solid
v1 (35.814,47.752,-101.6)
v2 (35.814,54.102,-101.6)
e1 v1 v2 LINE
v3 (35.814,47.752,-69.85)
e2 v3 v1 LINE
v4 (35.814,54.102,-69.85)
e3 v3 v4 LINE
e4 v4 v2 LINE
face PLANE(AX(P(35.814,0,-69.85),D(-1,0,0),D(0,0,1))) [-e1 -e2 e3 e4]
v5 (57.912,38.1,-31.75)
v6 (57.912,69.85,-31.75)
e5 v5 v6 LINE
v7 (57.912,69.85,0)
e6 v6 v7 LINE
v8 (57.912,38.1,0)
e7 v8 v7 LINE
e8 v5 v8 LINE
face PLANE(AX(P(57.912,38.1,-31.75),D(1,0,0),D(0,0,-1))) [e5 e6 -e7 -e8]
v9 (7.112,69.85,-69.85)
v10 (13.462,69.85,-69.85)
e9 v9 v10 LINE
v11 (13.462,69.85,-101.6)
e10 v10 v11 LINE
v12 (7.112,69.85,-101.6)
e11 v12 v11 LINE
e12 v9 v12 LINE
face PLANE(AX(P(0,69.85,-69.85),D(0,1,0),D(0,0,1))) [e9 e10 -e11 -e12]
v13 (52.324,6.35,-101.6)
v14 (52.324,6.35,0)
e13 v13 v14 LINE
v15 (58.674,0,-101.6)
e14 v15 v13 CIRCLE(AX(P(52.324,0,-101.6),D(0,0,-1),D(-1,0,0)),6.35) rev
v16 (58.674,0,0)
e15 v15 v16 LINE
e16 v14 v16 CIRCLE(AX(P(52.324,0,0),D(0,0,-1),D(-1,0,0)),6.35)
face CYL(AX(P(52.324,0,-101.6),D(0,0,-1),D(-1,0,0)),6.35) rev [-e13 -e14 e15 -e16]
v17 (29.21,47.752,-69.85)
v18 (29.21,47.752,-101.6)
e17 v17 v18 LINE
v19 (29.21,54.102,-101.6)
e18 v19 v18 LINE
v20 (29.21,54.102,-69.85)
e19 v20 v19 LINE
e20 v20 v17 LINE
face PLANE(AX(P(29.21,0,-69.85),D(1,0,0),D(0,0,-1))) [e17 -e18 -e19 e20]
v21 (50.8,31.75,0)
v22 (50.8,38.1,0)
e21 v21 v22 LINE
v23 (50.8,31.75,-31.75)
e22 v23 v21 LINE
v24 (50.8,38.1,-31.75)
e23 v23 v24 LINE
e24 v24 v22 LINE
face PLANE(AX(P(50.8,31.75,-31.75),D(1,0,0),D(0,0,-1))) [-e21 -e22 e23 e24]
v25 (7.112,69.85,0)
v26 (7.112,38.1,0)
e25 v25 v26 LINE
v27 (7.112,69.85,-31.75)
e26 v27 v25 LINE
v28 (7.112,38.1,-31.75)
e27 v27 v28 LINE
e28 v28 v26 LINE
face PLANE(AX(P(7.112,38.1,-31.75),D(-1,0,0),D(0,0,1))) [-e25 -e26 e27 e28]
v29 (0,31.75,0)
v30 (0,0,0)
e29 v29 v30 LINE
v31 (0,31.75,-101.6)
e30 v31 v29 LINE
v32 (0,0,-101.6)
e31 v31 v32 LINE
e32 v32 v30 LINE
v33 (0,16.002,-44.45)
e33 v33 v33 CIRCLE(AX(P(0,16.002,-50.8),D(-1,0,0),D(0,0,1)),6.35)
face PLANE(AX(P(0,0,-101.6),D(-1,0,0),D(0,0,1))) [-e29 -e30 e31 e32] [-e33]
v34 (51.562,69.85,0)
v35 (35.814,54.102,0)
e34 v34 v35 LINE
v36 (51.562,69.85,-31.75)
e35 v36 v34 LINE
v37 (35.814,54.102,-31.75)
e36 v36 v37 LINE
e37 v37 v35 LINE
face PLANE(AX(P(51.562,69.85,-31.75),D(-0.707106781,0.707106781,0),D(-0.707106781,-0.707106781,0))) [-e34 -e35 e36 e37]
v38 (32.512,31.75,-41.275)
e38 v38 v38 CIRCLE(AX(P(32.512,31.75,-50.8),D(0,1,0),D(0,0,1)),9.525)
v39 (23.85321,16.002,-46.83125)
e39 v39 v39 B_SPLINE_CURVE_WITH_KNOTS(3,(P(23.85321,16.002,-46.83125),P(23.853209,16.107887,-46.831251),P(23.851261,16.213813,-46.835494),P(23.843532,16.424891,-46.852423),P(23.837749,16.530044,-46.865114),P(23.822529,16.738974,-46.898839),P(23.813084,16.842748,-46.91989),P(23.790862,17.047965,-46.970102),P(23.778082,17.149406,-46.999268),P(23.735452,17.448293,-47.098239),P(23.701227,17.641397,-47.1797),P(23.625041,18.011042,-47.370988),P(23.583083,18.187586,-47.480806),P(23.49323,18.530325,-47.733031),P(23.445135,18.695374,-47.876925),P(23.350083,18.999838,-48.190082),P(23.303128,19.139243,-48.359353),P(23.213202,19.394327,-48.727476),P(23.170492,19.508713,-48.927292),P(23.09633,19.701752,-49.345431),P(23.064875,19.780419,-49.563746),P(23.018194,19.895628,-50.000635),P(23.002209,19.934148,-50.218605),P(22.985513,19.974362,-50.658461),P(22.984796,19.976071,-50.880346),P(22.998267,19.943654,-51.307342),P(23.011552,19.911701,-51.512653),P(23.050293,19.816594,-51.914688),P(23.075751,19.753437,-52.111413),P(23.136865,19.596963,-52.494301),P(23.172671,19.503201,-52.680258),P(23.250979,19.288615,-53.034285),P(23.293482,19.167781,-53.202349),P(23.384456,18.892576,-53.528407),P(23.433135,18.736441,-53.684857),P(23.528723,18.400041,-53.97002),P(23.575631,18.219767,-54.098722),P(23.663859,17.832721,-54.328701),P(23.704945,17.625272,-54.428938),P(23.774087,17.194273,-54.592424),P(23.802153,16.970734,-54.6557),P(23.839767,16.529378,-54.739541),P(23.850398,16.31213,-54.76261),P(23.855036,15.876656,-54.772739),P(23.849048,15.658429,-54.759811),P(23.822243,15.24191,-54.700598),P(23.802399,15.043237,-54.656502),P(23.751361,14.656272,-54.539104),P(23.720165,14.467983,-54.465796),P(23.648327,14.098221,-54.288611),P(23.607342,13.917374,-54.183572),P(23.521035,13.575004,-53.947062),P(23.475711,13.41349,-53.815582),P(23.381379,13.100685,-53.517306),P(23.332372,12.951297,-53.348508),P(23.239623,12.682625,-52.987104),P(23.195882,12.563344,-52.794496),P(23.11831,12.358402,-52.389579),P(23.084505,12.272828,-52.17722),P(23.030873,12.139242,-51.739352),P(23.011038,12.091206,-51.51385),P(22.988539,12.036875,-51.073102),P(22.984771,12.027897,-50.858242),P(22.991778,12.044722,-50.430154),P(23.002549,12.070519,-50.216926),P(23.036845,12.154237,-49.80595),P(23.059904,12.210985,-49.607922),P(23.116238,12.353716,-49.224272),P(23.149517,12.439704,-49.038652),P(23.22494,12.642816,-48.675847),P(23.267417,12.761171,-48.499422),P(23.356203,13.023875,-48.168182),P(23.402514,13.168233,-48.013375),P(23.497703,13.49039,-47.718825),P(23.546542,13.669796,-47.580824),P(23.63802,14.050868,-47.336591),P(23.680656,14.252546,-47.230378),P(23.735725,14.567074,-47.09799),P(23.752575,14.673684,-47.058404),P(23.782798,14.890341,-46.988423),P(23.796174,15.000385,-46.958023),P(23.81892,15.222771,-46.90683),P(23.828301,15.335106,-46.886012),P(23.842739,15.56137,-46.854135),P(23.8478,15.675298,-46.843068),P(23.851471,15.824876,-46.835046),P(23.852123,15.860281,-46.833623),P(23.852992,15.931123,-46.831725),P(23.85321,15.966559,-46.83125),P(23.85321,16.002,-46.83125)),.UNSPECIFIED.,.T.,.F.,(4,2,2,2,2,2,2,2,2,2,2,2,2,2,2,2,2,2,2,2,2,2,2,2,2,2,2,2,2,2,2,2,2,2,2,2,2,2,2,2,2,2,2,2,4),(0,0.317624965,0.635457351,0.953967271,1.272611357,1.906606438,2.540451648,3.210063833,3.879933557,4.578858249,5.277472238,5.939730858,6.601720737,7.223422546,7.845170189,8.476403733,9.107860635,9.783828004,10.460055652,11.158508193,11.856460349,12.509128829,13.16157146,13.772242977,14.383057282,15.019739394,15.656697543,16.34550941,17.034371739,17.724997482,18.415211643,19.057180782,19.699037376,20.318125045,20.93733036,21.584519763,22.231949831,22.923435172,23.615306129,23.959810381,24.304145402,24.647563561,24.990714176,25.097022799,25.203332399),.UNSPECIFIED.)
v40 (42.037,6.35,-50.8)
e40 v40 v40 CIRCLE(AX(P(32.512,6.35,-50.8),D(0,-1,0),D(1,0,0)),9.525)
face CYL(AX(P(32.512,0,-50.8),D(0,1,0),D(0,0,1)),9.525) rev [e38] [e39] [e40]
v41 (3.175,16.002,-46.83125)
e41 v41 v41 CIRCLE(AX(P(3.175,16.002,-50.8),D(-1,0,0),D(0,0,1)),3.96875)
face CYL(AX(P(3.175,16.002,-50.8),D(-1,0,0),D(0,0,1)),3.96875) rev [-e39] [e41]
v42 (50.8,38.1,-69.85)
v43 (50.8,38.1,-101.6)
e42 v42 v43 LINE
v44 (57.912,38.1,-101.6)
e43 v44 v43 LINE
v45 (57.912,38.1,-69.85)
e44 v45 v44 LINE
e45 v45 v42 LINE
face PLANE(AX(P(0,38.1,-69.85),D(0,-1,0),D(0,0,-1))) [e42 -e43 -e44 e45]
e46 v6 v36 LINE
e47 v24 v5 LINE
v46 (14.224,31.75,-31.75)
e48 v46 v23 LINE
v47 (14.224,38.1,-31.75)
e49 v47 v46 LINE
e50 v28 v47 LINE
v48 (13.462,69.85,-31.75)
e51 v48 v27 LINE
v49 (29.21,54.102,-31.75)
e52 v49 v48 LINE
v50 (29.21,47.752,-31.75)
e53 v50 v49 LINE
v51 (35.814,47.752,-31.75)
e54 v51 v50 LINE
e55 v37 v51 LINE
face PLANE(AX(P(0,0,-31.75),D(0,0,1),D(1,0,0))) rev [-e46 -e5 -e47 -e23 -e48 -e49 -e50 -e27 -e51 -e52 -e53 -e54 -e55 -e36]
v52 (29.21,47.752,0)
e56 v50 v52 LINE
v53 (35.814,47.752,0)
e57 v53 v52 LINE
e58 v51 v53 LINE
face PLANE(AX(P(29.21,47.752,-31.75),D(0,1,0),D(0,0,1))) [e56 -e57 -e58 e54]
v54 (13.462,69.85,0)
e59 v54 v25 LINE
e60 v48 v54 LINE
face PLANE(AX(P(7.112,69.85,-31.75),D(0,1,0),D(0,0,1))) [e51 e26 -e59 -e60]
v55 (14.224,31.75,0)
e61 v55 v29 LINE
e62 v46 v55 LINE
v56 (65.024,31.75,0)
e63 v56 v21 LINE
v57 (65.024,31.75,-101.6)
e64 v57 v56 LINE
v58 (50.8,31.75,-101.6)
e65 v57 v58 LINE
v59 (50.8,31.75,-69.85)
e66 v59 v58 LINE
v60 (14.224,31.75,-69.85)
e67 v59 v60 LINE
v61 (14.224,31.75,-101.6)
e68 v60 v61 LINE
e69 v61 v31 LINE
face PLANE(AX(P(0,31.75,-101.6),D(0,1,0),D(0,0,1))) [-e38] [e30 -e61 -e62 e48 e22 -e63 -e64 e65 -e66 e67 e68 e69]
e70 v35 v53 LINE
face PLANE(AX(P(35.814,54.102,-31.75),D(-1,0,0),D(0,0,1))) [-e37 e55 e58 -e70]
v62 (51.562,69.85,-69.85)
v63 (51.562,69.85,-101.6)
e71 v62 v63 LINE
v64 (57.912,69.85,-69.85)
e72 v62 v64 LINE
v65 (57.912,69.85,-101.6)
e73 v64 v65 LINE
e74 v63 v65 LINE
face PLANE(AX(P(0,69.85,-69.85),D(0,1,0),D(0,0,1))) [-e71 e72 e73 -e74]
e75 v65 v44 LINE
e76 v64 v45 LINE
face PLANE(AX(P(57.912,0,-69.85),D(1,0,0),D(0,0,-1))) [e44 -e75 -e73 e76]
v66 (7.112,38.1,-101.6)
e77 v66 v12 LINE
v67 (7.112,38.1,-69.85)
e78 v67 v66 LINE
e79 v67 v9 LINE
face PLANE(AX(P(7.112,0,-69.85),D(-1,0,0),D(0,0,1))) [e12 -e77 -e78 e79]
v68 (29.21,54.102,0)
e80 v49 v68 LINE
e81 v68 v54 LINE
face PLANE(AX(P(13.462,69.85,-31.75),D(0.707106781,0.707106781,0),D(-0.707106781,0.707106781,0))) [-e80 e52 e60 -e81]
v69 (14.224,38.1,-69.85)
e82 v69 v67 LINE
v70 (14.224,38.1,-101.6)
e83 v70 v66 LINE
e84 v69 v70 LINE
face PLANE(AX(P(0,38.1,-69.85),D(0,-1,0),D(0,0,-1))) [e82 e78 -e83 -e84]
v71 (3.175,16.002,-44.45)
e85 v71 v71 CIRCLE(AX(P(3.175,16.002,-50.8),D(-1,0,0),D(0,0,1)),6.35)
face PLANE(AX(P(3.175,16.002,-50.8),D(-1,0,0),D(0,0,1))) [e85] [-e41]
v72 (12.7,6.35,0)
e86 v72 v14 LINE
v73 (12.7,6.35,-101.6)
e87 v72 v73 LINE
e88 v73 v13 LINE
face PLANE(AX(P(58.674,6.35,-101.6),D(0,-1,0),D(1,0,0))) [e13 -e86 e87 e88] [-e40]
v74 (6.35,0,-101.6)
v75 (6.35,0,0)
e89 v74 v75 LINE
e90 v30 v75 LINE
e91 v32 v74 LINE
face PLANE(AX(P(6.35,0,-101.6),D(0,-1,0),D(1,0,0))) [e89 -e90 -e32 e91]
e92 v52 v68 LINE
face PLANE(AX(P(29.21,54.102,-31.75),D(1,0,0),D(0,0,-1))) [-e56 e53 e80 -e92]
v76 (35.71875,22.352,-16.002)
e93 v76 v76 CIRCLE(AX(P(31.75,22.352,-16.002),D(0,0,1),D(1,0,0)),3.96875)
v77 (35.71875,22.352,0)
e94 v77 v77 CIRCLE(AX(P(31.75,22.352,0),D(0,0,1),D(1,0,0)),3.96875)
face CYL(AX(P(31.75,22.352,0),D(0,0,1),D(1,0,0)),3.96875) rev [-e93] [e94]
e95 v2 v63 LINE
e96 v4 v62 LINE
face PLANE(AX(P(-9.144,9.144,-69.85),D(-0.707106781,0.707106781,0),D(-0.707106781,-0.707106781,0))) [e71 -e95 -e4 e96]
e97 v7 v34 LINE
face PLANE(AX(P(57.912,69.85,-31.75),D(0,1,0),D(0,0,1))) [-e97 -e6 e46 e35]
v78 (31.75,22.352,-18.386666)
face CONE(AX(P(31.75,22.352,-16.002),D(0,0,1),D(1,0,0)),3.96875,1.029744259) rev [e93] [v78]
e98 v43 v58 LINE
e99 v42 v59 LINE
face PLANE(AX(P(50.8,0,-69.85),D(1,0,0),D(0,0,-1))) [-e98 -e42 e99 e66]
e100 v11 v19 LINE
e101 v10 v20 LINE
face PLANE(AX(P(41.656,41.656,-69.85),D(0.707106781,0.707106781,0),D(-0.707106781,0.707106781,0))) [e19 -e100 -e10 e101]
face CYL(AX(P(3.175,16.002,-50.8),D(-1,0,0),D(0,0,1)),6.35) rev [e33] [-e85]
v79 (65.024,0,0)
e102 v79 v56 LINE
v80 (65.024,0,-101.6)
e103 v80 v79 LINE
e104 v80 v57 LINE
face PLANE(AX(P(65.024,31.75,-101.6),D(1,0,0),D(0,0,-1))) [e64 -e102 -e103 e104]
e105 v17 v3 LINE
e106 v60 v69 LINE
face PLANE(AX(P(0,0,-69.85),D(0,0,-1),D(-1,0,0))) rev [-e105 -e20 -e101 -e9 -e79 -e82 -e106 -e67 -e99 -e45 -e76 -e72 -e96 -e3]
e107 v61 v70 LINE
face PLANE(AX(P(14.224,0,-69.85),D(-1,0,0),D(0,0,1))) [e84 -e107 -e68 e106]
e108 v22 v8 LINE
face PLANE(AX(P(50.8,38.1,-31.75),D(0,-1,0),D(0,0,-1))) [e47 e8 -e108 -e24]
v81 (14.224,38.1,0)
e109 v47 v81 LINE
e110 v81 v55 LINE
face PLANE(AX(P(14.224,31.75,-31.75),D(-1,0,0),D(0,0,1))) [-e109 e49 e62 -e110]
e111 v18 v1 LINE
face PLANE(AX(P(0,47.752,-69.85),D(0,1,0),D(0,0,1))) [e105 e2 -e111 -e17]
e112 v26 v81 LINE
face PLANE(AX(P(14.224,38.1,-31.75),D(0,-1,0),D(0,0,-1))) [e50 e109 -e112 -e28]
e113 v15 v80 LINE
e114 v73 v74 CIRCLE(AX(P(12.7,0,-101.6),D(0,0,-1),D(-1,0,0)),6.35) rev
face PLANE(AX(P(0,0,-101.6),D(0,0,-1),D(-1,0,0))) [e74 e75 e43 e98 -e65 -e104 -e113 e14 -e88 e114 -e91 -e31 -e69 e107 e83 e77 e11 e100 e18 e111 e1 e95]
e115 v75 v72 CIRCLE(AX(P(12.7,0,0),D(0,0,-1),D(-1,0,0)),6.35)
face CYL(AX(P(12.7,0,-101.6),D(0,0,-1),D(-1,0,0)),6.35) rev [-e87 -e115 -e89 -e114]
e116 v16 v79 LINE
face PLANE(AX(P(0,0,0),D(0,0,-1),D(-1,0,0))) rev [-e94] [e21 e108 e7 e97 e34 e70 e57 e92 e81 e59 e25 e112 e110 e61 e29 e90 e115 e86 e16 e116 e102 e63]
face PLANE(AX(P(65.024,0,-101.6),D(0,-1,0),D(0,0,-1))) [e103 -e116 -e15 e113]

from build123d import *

# Parameters (mm, degrees)
BOSS_EXTRUDE1_DEPTH          = 101.6
FILLET1_R                    = 6.35
F_3_8_16_TAPPED_HOLE2_D      = 7.9375
F_3_8_16_TAPPED_HOLE2_DEPTH  = 16.002
F_3_8_16_TAPPED_HOLE2_TIP    = 2.384665582
SKETCH7_R                    = 9.525
CUT_EXTRUDE1_DEPTH           = 125.734690748
BOSS_EXTRUDE2_DEPTH          = 31.75
BOSS_EXTRUDE3_START          = -101.6
BOSS_EXTRUDE3_DEPTH          = 31.75
SKETCH9_R                    = 6.35
CUT_EXTRUDE2_DEPTH           = 3.175
F_3_8_16_TAPPED_HOLE3_REACH  = 139.938
F_3_8_16_TAPPED_HOLE3_BORE_R = 3.96875


with BuildPart() as part:
    # Sketch1 → Boss-Extrude1 (new body)
    with BuildSketch(Plane.XY):
        Polygon((0, 0), (0, 31.75), (65.024, 31.75), (65.024, 0), (58.674, 0), (58.674, 6.35), (6.35, 6.35), (6.35, 0), align=None)
    extrude(amount=-BOSS_EXTRUDE1_DEPTH)

    # Fillet1
    fillet1_edges = [part.edges().sort_by_distance(p)[0] for p in [
        (58.674, 6.35, -50.8),
        (6.35, 6.35, -50.8),
    ]]
    fillet(fillet1_edges, radius=FILLET1_R - 0.0001)  # a hair under: the kernel refuses the full size

    # 3/8-16 Tapped Hole2
    with Locations(Plane.XY):
        with Locations((31.75, 22.352)):
            Hole(F_3_8_16_TAPPED_HOLE2_D / 2, depth=F_3_8_16_TAPPED_HOLE2_DEPTH)
            with Locations((0, 0, -(F_3_8_16_TAPPED_HOLE2_DEPTH + F_3_8_16_TAPPED_HOLE2_TIP / 2))):  # 118° drill point
                Cone(0, F_3_8_16_TAPPED_HOLE2_D / 2, F_3_8_16_TAPPED_HOLE2_TIP, mode=Mode.SUBTRACT)

    # Sketch7 → Cut-Extrude1 (cut, through all)
    with BuildSketch(Plane(origin=(0, 31.75, 0), x_dir=(1, 0, 0), z_dir=(0, 1, 0))):
        with Locations(Location((32.512, 50.8, 0), (0, 0, 270))):
            Circle(SKETCH7_R)
    extrude(amount=-CUT_EXTRUDE1_DEPTH, mode=Mode.SUBTRACT)

    # Sketch8 → Boss-Extrude2 (add)
    with BuildSketch(Plane.XY):
        Polygon((14.224, 31.75), (14.224, 38.1), (7.112, 38.1), (7.112, 69.85), (13.462, 69.85), (29.21, 54.102), (29.21, 47.752), (35.814, 47.752), (35.814, 54.102), (51.562, 69.85), (57.912, 69.85), (57.912, 38.1), (50.8, 38.1), (50.8, 31.75), align=None)
    extrude(amount=-BOSS_EXTRUDE2_DEPTH)

    # Sketch8<3> → Boss-Extrude3 (add)
    with BuildSketch(Plane.XY.offset(BOSS_EXTRUDE3_START)):
        Polygon((14.224, 31.75), (14.224, 38.1), (7.112, 38.1), (7.112, 69.85), (13.462, 69.85), (29.21, 54.102), (29.21, 47.752), (35.814, 47.752), (35.814, 54.102), (51.562, 69.85), (57.912, 69.85), (57.912, 38.1), (50.8, 38.1), (50.8, 31.75), align=None)
    extrude(amount=BOSS_EXTRUDE3_DEPTH)

    # Sketch9 → Cut-Extrude2 (cut)
    with BuildSketch(Plane.ZY):
        with Locations((-50.8, 16.002)):
            Circle(SKETCH9_R)
    extrude(amount=-CUT_EXTRUDE2_DEPTH, mode=Mode.SUBTRACT)

    # 3/8-16 Tapped Hole3 bore → 3/8-16 Tapped Hole3 (cut, up to next)
    with BuildSketch(Plane.ZY.offset(-3.175), mode=Mode.PRIVATE) as f_3_8_16_tapped_hole3_sk1:
        with Locations((-50.8, 16.002)):
            Circle(F_3_8_16_TAPPED_HOLE3_BORE_R)
    f_3_8_16_tapped_hole3_tool1 = extrude(f_3_8_16_tapped_hole3_sk1.sketch, amount=-F_3_8_16_TAPPED_HOLE3_REACH, mode=Mode.PRIVATE) & part.part
    add(f_3_8_16_tapped_hole3_tool1.solids().sort_by_distance((3.175, 16.002, -50.8))[0], mode=Mode.SUBTRACT)


solid = part.part
